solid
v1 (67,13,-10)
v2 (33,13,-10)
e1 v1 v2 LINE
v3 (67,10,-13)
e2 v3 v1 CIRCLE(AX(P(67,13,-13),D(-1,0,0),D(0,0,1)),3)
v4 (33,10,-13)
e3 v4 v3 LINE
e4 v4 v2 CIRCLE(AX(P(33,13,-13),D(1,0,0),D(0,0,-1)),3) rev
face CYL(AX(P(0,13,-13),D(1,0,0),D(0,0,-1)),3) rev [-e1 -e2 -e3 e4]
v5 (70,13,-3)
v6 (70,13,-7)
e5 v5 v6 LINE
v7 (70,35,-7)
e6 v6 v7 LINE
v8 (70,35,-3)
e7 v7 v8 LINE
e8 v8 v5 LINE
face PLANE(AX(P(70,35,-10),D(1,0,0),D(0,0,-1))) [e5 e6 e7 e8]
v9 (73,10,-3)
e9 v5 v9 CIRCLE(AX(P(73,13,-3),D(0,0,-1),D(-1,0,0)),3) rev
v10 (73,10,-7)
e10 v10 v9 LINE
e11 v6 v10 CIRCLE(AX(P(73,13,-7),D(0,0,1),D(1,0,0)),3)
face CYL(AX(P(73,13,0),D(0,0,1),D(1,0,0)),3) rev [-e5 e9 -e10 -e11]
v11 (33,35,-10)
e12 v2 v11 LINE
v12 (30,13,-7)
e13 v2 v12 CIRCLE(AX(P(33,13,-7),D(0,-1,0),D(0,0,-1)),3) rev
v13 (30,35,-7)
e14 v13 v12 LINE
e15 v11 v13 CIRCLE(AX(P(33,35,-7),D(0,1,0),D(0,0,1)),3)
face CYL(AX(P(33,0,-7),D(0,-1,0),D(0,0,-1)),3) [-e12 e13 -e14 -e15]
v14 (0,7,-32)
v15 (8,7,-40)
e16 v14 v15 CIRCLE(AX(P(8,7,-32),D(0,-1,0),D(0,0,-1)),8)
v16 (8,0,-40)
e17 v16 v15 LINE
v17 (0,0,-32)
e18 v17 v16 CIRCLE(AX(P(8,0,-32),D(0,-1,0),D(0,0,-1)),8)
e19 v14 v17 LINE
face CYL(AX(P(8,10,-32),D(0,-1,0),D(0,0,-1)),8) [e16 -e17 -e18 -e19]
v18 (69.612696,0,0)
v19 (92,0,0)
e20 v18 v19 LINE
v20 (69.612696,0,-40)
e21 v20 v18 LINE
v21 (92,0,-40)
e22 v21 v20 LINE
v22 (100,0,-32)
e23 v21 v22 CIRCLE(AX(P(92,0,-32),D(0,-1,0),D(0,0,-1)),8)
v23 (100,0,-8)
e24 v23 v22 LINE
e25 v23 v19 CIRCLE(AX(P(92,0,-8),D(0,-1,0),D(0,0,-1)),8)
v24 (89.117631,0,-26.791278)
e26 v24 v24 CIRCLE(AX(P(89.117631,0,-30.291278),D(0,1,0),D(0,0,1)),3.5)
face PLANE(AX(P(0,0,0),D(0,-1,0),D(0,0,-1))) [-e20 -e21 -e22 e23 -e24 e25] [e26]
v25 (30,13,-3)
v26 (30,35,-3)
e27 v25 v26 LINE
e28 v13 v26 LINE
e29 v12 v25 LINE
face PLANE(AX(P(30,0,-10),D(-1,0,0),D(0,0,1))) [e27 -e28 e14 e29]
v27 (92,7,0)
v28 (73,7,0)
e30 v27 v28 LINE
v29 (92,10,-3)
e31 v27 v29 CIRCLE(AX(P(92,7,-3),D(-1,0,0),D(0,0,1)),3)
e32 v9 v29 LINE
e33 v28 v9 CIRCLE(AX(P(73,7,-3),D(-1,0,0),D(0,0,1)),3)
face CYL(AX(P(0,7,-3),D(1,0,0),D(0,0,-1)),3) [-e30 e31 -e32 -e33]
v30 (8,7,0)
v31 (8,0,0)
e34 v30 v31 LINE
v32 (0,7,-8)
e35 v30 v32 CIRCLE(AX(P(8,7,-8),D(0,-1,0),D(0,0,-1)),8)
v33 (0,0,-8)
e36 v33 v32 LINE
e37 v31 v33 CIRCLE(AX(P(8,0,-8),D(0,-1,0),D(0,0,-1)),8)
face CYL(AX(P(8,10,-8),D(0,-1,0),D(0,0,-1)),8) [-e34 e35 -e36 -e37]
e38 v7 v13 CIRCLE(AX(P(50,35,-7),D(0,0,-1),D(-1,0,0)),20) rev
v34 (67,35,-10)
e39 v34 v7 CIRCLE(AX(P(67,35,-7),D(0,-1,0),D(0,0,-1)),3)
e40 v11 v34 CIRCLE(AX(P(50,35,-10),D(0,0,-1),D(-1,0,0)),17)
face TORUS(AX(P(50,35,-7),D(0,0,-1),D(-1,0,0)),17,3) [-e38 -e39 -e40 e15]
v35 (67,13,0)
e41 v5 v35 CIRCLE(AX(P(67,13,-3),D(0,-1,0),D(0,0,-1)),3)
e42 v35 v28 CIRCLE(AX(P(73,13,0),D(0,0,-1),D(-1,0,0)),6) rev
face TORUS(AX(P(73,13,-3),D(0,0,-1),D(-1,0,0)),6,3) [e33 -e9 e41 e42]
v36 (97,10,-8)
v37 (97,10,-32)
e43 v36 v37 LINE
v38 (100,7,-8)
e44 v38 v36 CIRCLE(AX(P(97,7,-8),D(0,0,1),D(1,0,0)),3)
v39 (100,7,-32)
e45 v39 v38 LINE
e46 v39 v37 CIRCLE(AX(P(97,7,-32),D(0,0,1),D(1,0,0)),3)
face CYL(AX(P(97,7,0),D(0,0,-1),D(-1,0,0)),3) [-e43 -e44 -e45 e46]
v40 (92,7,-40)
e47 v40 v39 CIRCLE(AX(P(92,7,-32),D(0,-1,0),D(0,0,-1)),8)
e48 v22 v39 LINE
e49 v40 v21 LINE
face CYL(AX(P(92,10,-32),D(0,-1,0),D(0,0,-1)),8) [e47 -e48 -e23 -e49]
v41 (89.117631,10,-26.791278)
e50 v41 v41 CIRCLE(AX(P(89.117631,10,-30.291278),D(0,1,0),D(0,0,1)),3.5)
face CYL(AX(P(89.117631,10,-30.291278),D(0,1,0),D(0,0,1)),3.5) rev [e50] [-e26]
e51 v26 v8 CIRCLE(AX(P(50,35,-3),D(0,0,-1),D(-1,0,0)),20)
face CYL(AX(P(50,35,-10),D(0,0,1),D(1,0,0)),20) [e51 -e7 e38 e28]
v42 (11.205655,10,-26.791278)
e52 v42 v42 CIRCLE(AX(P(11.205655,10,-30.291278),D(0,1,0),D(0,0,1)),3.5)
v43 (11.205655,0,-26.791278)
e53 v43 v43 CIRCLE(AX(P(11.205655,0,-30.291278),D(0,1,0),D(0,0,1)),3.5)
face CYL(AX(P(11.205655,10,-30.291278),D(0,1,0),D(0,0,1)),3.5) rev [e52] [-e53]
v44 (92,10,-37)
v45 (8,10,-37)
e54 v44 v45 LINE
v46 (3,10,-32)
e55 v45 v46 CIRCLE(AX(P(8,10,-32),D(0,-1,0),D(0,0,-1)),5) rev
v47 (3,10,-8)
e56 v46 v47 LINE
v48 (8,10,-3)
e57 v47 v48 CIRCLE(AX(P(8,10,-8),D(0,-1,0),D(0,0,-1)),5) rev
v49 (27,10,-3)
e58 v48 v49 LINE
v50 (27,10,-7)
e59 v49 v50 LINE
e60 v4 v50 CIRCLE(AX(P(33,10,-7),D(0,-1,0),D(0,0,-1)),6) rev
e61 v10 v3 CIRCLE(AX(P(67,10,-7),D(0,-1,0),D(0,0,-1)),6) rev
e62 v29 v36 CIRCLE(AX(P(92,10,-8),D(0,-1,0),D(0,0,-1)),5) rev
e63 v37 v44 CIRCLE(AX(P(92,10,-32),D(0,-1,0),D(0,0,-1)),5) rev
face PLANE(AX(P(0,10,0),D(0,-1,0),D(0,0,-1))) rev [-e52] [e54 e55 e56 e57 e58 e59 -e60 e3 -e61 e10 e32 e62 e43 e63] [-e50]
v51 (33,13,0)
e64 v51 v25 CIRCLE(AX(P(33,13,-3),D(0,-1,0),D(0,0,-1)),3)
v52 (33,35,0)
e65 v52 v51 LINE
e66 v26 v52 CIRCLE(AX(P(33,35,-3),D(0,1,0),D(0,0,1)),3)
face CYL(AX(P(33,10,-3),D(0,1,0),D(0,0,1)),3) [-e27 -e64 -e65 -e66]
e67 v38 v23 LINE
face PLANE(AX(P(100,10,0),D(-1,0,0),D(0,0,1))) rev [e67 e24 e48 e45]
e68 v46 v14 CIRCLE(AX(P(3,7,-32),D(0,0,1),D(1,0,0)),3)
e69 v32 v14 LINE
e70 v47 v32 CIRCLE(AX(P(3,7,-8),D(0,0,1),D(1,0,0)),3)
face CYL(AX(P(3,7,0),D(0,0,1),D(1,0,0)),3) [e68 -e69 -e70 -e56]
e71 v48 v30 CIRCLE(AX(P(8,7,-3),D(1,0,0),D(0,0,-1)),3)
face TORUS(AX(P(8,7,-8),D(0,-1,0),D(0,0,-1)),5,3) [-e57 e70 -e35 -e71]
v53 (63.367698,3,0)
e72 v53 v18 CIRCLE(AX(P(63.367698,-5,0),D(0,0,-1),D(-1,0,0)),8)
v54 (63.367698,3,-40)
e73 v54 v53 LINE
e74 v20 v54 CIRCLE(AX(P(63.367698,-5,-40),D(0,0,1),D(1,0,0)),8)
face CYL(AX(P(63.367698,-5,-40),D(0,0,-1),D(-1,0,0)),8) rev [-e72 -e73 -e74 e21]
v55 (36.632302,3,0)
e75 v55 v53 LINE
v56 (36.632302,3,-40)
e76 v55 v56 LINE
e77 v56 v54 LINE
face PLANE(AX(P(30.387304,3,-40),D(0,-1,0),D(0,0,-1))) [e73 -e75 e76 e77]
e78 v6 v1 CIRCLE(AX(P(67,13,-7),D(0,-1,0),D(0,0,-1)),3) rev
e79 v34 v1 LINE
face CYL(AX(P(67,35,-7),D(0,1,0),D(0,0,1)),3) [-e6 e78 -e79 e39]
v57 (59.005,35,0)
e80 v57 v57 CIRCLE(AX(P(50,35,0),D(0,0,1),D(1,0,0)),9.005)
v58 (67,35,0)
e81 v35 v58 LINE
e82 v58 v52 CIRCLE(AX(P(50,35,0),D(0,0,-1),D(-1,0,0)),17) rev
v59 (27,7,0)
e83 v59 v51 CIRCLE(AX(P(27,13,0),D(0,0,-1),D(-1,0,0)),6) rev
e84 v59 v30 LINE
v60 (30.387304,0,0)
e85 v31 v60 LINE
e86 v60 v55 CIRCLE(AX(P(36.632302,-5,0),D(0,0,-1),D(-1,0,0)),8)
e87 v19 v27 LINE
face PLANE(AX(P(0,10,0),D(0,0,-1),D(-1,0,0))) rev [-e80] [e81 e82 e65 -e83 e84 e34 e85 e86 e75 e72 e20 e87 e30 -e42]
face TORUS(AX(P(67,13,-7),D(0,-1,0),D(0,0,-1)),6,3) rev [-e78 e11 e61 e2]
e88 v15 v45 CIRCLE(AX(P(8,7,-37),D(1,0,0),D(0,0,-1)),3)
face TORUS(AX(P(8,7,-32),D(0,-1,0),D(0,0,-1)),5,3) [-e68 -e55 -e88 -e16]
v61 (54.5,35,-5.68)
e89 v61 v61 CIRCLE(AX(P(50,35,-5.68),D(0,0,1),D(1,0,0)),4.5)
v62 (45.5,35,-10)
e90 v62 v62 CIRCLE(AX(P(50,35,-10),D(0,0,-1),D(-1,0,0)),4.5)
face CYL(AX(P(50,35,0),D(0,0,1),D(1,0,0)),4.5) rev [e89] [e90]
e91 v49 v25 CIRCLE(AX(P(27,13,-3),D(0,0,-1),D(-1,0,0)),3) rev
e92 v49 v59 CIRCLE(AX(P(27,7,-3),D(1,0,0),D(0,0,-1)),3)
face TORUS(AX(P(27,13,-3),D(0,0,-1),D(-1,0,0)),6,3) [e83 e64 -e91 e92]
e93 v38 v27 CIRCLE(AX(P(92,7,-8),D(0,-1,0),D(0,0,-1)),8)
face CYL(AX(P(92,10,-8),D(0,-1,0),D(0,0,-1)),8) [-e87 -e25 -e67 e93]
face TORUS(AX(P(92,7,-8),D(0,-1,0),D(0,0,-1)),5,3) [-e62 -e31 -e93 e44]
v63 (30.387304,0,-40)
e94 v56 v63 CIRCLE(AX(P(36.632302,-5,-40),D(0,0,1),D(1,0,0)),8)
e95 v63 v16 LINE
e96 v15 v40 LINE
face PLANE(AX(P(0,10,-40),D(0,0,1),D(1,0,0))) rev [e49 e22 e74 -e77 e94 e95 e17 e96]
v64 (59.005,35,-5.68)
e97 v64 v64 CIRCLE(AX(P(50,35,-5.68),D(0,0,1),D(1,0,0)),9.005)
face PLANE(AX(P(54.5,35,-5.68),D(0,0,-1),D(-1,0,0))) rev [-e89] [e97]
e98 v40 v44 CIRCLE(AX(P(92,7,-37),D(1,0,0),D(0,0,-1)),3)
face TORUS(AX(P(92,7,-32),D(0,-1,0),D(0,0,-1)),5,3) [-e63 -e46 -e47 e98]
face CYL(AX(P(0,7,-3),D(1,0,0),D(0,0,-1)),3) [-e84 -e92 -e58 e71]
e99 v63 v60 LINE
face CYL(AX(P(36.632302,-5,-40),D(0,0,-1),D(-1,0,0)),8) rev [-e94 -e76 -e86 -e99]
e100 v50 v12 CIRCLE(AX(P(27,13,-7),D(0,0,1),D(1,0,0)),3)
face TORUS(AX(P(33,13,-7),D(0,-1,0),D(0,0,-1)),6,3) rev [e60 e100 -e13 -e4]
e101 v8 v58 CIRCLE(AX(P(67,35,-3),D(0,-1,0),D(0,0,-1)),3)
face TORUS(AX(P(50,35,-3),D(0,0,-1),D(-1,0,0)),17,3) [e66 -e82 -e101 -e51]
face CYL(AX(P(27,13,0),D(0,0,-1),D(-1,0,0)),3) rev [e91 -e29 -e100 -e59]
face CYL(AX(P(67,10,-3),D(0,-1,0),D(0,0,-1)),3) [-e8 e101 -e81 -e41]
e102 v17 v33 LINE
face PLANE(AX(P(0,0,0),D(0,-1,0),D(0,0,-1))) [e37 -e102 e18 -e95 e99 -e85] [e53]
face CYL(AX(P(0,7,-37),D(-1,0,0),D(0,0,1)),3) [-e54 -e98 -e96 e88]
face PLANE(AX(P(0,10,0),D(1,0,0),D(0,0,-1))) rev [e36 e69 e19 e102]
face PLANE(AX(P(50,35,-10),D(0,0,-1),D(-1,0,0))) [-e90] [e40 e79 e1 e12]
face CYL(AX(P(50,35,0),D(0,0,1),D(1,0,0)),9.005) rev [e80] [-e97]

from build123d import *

# Parameters (mm, degrees)
ESBO_O1_W                                            = 100
ESBO_O1_H                                            = 40
BASEPLATE_DEPTH                                      = 10
VERTBOSS_DEPTH                                       = 10
ESBO_O3_W                                            = 39.225392784
ESBO_O3_H                                            = 3
BOTTOMSLOT_DEPTH                                     = 121.933866224
REBAIXO_PARA_PARAFUSO_DE_CABE_A_SEXTAVAD_D           = 9
REBAIXO_PARA_PARAFUSO_DE_CABE_A_SEXTAVAD_CBORE_D     = 18.01
REBAIXO_PARA_PARAFUSO_DE_CABE_A_SEXTAVAD_CBORE_DEPTH = 5.68
FILETE1_R                                            = 8
FILETE2_R                                            = 3
FURO_DE_DI_METRO_7_0_7_2_D                           = 7


with BuildPart() as part:
    # Esboço1 → BasePlate (new body)
    with BuildSketch(Plane(origin=(0, 0, 0), x_dir=(1, 0, 0), z_dir=(0, 1, 0))):
        with Locations((50, 20)):
            Rectangle(ESBO_O1_W, ESBO_O1_H)
    extrude(amount=BASEPLATE_DEPTH)

    # Esboço2 → VertBoss (add)
    with BuildSketch(Plane.XY):
        with BuildLine():
            Line((30, 0), (30, 35))
            ThreePointArc((30, 35), (50, 55), (70, 35))
            Line((70, 35), (70, 0))
            Line((70, 0), (30, 0))
        make_face()
    extrude(amount=-VERTBOSS_DEPTH)

    # Esboço3 → BottomSlot (cut, through all)
    with BuildSketch(Plane.XY):
        with Locations((50, 1.5)):
            Rectangle(ESBO_O3_W, ESBO_O3_H)
    extrude(amount=-BOTTOMSLOT_DEPTH, mode=Mode.SUBTRACT)

    # Rebaixo para parafuso de cabeça sextavada de M81 (through all)
    with Locations(Plane.XY):
        with Locations((50, 35)):
            CounterBoreHole(REBAIXO_PARA_PARAFUSO_DE_CABE_A_SEXTAVAD_D / 2, REBAIXO_PARA_PARAFUSO_DE_CABE_A_SEXTAVAD_CBORE_D / 2, REBAIXO_PARA_PARAFUSO_DE_CABE_A_SEXTAVAD_CBORE_DEPTH)

    # Filete1
    # the kernel refuses this fillet: 8 mm, written as the material it adds along each edge
    with BuildSketch(Plane(origin=(69.612696392, 3, 0), x_dir=(-1, 0, 0), z_dir=(0, 0, -1))) as filete1_piece_1:
        with BuildLine():
            CenterArc((6.244997998, -8), FILETE1_R, 90, 51.317812547)
            Line((0, -3), (0, 0))
            Line((0, 0), (6.244997998, 0))
        make_face()
    extrude(amount=40)
    with BuildSketch(Plane(origin=(30.387303608, 3, 0), x_dir=(0, -1, 0), z_dir=(0, 0, -1))) as filete1_piece_2:
        with BuildLine():
            CenterArc((8, -6.244997998), FILETE1_R, 128.682187453, 51.317812547)
            Line((0, -6.244997998), (0, 0))
            Line((0, 0), (3, 0))
        make_face()
    extrude(amount=40)
    # the kernel refuses this fillet: 8 mm, written as the material it takes off along each edge
    with BuildSketch(Plane(origin=(0, -20, -40), x_dir=(0, 0, 1), z_dir=(0, 1, 0)), Plane(origin=(0, -20, 0), x_dir=(1, 0, 0), z_dir=(0, 1, 0))) as filete1_2_piece_1:
        with BuildLine():
            CenterArc((FILETE1_R, FILETE1_R), FILETE1_R, 180, 90)
            Line((0, FILETE1_R), (0, 0))
            Line((0, 0), (FILETE1_R, 0))
        make_face()
    extrude(amount=50, mode=Mode.SUBTRACT)
    with BuildSketch(Plane(origin=(100, -20, 0), x_dir=(-1, 0, 0), z_dir=(0, 1, 0)), Plane(origin=(100, -20, -40), x_dir=(0, 0, 1), z_dir=(0, 1, 0))) as filete1_2_piece_2:
        with BuildLine():
            CenterArc((FILETE1_R, -FILETE1_R), FILETE1_R, 90, 90)
            Line((0, -FILETE1_R), (0, 0))
            Line((0, 0), (FILETE1_R, 0))
        make_face()
    extrude(amount=50, mode=Mode.SUBTRACT)

    # Filete2
    filete2_edges = [part.edges().sort_by_distance(p)[0] for p in [
        (81, 10, 0),
        (30, 22.5, -10),
        (70, 22.5, -10),
        (30, 22.5, 0),
        (70, 22.5, 0),
        (50, 55, 0),
        (30, 10, -5),
        (50, 55, -10),
        (70, 10, -5),
        (50, 10, -10),
        (0, 10, -20),
        (50, 10, -40),
        (19, 10, 0),
        (100, 10, -20),
        (2.343145751, 10, -2.343145751),
        (97.656854249, 10, -37.656854249),
        (97.656854249, 10, -2.343145751),
        (2.343145751, 10, -37.656854249),
    ]]
    fillet(filete2_edges, radius=FILETE2_R)

    # Furo de diâmetro Ø7.0 (7)2 (through all)
    with Locations(Plane(origin=(0, 10, 0), x_dir=(1, 0, 0), z_dir=(0, 1, 0))):
        with Locations((11.205655488, 30.291277502), (89.117630716, 30.291277502)):
            Hole(FURO_DE_DI_METRO_7_0_7_2_D / 2)


solid = part.part
